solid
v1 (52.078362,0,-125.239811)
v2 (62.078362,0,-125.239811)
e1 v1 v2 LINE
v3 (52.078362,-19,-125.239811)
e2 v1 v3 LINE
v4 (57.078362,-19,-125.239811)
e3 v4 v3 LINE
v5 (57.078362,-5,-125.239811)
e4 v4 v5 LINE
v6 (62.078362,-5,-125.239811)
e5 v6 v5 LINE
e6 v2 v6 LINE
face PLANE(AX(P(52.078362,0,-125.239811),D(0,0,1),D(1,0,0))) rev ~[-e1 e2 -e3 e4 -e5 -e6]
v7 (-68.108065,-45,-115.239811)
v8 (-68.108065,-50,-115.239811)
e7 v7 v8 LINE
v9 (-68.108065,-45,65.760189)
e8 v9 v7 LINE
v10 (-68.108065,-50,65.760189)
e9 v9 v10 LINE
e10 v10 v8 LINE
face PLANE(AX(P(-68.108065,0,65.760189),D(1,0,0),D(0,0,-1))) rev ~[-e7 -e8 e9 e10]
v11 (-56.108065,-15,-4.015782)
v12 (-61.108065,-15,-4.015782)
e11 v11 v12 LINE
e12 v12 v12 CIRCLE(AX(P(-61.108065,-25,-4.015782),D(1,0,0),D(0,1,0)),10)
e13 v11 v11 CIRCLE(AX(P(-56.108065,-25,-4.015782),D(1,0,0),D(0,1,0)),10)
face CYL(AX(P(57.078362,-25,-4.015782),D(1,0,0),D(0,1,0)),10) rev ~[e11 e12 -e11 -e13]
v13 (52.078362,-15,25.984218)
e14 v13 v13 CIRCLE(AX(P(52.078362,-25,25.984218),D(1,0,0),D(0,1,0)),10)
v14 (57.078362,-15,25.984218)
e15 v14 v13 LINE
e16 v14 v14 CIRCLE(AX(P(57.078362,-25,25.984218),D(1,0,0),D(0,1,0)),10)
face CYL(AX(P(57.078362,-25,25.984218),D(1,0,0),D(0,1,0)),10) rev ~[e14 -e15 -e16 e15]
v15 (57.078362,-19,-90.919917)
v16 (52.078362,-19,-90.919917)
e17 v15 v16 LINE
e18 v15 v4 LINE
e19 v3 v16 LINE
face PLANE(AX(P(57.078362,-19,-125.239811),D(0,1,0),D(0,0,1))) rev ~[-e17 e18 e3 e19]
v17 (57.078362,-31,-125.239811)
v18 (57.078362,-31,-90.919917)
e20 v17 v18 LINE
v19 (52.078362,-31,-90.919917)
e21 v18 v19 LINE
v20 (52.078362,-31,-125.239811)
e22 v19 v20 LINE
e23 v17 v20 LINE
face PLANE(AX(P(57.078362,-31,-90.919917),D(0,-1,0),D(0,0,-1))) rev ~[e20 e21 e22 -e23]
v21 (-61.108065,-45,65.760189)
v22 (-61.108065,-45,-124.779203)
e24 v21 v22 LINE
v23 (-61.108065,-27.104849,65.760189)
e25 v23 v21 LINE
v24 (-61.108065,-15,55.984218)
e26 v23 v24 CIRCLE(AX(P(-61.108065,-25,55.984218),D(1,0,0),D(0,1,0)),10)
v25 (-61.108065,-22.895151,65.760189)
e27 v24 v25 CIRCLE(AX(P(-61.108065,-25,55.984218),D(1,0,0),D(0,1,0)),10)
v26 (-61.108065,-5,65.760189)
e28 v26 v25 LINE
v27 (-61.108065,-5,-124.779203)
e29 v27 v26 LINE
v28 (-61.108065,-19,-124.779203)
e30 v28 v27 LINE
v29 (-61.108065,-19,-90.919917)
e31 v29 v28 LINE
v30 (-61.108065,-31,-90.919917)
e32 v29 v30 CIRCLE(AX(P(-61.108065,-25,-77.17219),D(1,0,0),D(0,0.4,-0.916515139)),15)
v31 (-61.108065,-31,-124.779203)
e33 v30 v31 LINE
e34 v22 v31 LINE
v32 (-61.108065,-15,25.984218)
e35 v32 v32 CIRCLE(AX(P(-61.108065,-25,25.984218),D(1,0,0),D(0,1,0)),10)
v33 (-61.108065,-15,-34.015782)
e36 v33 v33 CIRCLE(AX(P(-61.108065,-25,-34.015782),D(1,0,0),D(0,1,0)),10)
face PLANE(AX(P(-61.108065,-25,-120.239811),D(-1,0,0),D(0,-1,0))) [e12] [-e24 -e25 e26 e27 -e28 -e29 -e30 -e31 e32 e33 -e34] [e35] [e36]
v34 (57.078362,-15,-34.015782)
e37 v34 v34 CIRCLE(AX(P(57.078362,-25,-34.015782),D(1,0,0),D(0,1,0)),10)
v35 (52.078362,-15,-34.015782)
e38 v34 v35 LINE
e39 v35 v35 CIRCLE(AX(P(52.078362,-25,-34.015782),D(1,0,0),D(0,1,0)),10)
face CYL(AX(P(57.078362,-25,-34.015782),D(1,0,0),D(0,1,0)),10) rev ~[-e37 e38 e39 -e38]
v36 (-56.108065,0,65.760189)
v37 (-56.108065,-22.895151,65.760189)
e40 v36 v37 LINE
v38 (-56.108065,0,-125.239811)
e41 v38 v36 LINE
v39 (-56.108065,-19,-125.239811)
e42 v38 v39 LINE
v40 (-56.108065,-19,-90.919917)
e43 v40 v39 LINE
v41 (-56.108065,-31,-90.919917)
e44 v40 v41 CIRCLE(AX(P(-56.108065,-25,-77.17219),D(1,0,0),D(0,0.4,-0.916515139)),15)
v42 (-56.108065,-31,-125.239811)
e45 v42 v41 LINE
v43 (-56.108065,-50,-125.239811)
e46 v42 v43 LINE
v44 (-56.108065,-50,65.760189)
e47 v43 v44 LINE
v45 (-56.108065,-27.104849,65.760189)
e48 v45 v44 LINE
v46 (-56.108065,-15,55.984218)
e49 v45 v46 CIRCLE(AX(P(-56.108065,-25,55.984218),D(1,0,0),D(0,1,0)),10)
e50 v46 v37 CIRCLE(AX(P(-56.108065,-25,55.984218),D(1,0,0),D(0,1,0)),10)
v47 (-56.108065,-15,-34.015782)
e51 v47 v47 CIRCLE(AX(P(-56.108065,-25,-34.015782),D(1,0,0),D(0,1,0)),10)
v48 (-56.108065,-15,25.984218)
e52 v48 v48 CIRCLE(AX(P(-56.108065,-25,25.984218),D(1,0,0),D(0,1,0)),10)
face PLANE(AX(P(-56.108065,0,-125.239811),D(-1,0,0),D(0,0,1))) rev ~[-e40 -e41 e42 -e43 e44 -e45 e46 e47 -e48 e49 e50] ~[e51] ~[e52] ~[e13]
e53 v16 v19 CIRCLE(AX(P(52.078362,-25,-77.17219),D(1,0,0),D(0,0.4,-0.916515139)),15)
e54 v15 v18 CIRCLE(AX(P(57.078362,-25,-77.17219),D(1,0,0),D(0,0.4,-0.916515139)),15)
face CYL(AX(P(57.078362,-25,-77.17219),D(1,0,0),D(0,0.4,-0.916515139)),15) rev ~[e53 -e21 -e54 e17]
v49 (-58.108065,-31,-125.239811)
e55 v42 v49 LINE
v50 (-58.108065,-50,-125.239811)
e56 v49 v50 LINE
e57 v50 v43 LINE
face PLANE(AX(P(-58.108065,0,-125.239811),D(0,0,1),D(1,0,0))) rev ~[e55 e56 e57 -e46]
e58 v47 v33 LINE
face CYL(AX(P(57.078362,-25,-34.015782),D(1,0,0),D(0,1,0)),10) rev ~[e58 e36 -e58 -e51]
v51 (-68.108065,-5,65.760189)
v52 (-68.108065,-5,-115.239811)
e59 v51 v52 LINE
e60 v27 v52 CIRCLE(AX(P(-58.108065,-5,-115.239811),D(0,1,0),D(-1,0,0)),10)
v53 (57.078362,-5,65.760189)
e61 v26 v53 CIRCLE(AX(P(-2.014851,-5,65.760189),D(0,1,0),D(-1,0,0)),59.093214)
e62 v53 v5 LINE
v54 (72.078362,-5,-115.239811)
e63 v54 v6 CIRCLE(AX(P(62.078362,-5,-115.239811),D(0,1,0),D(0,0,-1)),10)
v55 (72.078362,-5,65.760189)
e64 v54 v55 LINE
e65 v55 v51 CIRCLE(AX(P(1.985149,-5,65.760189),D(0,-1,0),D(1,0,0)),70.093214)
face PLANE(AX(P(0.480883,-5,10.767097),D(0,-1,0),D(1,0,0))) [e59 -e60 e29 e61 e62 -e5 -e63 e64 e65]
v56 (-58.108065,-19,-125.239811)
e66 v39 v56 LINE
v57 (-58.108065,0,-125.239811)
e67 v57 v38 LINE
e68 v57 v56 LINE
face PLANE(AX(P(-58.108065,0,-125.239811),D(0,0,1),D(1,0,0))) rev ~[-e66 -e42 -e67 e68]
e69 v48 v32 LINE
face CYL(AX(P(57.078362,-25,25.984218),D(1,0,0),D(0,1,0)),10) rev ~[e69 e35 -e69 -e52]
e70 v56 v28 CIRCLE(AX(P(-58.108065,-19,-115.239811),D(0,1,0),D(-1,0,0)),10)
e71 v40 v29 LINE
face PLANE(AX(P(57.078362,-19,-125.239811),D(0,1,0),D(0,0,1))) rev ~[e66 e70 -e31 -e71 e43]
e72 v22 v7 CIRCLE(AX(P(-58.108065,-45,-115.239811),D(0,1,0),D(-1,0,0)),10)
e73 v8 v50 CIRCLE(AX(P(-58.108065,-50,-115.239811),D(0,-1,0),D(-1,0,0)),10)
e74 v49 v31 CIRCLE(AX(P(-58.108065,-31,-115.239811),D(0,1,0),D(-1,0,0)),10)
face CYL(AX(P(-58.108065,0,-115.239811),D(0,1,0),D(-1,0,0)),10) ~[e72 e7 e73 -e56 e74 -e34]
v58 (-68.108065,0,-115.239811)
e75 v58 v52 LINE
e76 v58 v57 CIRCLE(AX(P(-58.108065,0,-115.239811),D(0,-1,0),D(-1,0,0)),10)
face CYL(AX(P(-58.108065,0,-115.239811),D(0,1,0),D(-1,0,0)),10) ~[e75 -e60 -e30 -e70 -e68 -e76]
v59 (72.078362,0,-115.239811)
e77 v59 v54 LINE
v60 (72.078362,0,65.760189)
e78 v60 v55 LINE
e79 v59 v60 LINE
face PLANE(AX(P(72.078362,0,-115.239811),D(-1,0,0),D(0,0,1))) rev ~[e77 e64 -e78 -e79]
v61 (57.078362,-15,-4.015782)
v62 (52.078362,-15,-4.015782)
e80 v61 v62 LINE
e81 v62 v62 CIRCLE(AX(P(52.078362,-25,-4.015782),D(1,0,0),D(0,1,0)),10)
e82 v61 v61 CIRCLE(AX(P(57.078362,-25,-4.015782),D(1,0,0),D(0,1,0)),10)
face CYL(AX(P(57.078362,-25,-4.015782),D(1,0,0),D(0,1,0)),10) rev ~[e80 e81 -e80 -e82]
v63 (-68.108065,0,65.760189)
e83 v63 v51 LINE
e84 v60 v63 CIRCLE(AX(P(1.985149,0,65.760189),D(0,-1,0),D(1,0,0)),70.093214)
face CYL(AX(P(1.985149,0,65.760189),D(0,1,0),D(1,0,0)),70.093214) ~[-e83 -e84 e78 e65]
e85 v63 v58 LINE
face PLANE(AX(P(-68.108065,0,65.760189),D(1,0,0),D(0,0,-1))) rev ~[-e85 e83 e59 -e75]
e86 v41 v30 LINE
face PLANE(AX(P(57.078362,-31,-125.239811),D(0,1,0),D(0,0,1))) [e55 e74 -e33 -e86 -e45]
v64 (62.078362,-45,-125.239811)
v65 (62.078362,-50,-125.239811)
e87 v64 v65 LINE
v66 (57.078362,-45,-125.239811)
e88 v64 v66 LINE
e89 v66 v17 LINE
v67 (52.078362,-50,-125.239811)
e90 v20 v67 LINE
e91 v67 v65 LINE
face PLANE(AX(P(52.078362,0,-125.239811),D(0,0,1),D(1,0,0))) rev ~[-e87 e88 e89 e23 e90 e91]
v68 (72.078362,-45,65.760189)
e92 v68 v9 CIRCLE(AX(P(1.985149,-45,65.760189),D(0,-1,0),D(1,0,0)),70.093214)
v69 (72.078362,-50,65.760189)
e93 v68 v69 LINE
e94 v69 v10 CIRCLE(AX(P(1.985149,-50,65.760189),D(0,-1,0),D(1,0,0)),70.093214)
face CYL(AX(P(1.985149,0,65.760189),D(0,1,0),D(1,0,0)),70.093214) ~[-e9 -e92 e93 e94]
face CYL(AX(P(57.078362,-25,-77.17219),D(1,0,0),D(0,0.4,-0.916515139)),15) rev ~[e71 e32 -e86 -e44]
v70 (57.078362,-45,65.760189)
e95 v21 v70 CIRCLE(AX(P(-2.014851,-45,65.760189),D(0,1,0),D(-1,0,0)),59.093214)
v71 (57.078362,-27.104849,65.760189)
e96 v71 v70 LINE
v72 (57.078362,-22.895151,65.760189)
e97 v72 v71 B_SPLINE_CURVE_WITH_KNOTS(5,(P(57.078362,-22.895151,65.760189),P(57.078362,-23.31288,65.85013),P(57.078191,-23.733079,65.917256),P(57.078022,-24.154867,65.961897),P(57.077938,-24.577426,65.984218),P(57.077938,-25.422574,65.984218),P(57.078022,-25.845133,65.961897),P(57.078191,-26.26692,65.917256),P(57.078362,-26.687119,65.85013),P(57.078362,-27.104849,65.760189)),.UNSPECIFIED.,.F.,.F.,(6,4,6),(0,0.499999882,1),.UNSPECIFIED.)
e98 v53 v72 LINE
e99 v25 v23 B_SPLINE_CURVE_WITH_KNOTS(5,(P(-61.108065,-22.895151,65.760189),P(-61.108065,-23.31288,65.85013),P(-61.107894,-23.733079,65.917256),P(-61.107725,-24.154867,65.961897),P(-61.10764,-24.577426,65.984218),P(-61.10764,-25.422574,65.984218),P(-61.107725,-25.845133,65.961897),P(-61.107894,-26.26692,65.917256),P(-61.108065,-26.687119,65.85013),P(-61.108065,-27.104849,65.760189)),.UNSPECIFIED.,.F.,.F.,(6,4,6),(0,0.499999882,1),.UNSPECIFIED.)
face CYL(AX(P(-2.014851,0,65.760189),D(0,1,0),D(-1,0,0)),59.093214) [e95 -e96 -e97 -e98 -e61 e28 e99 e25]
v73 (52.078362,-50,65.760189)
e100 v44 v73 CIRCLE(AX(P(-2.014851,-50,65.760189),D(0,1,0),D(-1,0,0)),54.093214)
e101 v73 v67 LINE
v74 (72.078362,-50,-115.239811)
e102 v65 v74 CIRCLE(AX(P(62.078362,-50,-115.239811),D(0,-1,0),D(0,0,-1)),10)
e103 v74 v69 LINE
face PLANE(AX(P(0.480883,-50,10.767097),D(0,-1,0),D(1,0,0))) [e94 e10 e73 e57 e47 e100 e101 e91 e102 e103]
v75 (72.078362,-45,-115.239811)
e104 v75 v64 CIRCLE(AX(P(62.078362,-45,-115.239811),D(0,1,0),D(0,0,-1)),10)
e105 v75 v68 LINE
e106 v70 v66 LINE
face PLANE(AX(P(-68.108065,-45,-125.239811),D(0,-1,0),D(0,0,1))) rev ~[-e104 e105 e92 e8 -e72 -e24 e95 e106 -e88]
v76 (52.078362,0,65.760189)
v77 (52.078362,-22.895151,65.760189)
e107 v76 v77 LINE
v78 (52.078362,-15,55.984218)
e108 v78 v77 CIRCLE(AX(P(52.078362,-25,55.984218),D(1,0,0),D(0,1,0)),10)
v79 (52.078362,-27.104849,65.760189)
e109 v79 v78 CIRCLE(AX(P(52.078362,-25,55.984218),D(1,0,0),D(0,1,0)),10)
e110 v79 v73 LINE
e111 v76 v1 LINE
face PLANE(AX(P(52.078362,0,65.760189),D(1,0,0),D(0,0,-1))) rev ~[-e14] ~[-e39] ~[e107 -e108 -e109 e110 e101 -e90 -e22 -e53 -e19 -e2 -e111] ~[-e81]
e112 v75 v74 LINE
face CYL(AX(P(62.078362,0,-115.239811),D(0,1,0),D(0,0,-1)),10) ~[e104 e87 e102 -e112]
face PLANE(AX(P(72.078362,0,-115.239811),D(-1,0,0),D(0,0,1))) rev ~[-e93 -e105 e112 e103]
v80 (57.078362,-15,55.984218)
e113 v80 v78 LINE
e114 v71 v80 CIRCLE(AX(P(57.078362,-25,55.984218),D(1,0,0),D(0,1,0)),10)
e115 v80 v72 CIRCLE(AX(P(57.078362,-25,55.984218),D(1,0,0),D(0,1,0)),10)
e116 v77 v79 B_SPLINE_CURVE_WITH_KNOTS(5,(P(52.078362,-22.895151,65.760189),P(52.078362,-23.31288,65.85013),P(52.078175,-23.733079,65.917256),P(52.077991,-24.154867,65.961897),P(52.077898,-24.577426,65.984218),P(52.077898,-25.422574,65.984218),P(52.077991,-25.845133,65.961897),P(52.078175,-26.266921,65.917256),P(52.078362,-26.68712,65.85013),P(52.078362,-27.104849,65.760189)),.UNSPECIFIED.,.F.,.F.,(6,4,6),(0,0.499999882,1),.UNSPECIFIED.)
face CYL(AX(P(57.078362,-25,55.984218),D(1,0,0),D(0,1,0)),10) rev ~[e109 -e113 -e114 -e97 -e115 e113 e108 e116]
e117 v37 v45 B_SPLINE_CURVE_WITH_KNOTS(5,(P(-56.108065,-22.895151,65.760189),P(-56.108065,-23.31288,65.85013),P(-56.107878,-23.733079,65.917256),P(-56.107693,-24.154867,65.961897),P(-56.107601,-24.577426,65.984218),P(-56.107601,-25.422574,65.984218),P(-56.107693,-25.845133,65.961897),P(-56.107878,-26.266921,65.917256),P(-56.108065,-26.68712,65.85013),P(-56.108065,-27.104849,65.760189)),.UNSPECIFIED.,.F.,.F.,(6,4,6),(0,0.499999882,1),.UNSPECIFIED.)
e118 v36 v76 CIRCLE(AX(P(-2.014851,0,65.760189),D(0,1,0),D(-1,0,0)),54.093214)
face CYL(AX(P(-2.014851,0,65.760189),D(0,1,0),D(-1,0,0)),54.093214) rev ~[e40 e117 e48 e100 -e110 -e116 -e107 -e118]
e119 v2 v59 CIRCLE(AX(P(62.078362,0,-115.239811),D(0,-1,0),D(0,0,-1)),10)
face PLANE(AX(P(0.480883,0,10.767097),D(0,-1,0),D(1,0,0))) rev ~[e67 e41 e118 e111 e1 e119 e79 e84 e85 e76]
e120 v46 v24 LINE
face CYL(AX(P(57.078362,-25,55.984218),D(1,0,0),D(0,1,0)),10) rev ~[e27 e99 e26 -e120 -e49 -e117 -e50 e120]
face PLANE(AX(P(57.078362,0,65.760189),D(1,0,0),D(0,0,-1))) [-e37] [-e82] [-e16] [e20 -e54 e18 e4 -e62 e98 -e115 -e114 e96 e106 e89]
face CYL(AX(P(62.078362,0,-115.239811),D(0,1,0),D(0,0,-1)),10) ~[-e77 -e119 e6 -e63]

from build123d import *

# Parameters (mm, degrees)
F1_DEPTH  = 50
F2_T      = 5
F4_R      = 10
F5_DEPTH  = 125.1874270275
F6_DEPTH  = 125.1874270275
F7_W      = 40
F7_H      = 10
F8_DEPTH  = 15
F9_W      = 40
F9_H      = 10
F10_DEPTH = 7
F11_W     = 12
F11_H     = 5
F12_DEPTH = 125.1874270275


# Not quite as in the source:
# - a shell that OpenCascade refuses in one call is made with other operations: the cavity is built on its own and cut out
# - a feature names something its author has since deleted; it is built from what else it names


with BuildPart() as f1:
    # F0 (on Front) → F1 (new body)
    with BuildSketch(Plane.XZ):
        with BuildLine():
            Line((-68.1080648237, 65.760188823), (-68.1080648237, -115.239811177))
            ThreePointArc((-68.1080648237, -115.239811177), (-65.1791326356, -122.3108789889), (-58.1080648237, -125.239811177))
            Line((-58.1080648237, -125.239811177), (-56.1080648237, -125.239811177))
            Line((-56.1080648237, -125.239811177), (-56.1080648237, 65.760188823))
            ThreePointArc((-56.1080648237, 65.760188823), (-2.01485131, 119.8534023367), (52.0783622037, 65.760188823))
            Line((52.0783622037, 65.760188823), (52.0783622037, -125.239811177))
            Line((52.0783622037, -125.239811177), (62.0783622037, -125.239811177))
            ThreePointArc((62.0783622037, -125.239811177), (69.1494300156, -122.3108789889), (72.0783622037, -115.239811177))
            Line((72.0783622037, -115.239811177), (72.0783622037, 65.760188823))
            ThreePointArc((72.0783622037, 65.760188823), (1.98514869, 135.8534023367), (-68.1080648237, 65.760188823))
        make_face()
    extrude(amount=F1_DEPTH)

    # F2: shell of thickness 5, made by hand


with BuildPart() as f2_core1:
    # F2_t2: copy of F1
    add(f1.part)

    # the walls: a layer under each face that stays
    f2_faces = [f2_core1.faces().sort_by_distance(p)[0] for p in [
        (52.0783622037, -25, -29.739811177),
        (57.0783622037, -25, -125.239811177),
        (69.1494300156, -25, -122.3108789889),
        (-65.1791326356, -25, -122.3108789889),
        (-57.1080648237, -25, -125.239811177),
        (-56.1080648237, -25, -29.739811177),
        (-2.01485131, -25, 119.8534023367),
        (48.7139576992, 0, 92.3378667511),
        (48.7139576992, -50, 92.3378667511),
    ]]
    thicken(f2_faces, amount=-F2_T, mode=Mode.SUBTRACT)


with BuildPart() as f1_1:
    add(f1.part)

    # what is left inside the walls is the cavity
    f2_cavity = [f2_core1.part.solids().sort_by_distance(p)[0] for p in [
        (1.985149, -31.666667, 135.803402),
    ]]
    add(f2_cavity, mode=Mode.SUBTRACT)

    # F4 (on face) → F5 (cut, through all)
    with BuildSketch(Plane.YZ.offset(57.0783622037)):
        with Locations((-25, 55.9842178226)):
            Circle(F4_R)
        with Locations((-25, 25.9842178226)):
            Circle(F4_R)
        with Locations((-25, -4.0157821774)):
            Circle(F4_R)
        with Locations((-25, -34.0157821774)):
            Circle(F4_R)
    extrude(amount=-F5_DEPTH, mode=Mode.SUBTRACT)

    # F3 (on face) → F6 (cut, through all)
    with BuildSketch(Plane.YZ.offset(57.0783622037)):
        with BuildLine():
            Line((-19, -120.239811177), (-19, -90.9199170358))
            ThreePointArc((-19, -90.9199170358), (-25, -62.1721899509), (-31, -90.9199170358))
            Line((-31, -90.9199170358), (-31, -120.239811177))
            Line((-31, -120.239811177), (-19, -120.239811177))
        make_face()
    extrude(amount=-F6_DEPTH, mode=Mode.SUBTRACT)

    # F7 (on face) → F8 (cut)
    with BuildSketch(Plane.YZ.offset(72.0783622037)):
        with Locations((-25, -120.239811177)):
            Rectangle(F7_W, F7_H)
    extrude(amount=-F8_DEPTH, mode=Mode.SUBTRACT)

    # F9 (on face) → F10 (cut)
    with BuildSketch(Plane(origin=(-68.1080648237, 0, 0), x_dir=(0, -1, 0), z_dir=(-1, 0, 0))):
        with Locations((25, -120.239811177)):
            Rectangle(F9_W, F9_H)
    extrude(amount=-F10_DEPTH, mode=Mode.SUBTRACT)

    # F11 (on face) → F12 (cut, through all)
    with BuildSketch(Plane.YZ.offset(57.0783622037)):
        with Locations((-25, -122.739811177)):
            Rectangle(F11_W, F11_H)
    extrude(amount=-F12_DEPTH, mode=Mode.SUBTRACT)


solid = f1_1.part
